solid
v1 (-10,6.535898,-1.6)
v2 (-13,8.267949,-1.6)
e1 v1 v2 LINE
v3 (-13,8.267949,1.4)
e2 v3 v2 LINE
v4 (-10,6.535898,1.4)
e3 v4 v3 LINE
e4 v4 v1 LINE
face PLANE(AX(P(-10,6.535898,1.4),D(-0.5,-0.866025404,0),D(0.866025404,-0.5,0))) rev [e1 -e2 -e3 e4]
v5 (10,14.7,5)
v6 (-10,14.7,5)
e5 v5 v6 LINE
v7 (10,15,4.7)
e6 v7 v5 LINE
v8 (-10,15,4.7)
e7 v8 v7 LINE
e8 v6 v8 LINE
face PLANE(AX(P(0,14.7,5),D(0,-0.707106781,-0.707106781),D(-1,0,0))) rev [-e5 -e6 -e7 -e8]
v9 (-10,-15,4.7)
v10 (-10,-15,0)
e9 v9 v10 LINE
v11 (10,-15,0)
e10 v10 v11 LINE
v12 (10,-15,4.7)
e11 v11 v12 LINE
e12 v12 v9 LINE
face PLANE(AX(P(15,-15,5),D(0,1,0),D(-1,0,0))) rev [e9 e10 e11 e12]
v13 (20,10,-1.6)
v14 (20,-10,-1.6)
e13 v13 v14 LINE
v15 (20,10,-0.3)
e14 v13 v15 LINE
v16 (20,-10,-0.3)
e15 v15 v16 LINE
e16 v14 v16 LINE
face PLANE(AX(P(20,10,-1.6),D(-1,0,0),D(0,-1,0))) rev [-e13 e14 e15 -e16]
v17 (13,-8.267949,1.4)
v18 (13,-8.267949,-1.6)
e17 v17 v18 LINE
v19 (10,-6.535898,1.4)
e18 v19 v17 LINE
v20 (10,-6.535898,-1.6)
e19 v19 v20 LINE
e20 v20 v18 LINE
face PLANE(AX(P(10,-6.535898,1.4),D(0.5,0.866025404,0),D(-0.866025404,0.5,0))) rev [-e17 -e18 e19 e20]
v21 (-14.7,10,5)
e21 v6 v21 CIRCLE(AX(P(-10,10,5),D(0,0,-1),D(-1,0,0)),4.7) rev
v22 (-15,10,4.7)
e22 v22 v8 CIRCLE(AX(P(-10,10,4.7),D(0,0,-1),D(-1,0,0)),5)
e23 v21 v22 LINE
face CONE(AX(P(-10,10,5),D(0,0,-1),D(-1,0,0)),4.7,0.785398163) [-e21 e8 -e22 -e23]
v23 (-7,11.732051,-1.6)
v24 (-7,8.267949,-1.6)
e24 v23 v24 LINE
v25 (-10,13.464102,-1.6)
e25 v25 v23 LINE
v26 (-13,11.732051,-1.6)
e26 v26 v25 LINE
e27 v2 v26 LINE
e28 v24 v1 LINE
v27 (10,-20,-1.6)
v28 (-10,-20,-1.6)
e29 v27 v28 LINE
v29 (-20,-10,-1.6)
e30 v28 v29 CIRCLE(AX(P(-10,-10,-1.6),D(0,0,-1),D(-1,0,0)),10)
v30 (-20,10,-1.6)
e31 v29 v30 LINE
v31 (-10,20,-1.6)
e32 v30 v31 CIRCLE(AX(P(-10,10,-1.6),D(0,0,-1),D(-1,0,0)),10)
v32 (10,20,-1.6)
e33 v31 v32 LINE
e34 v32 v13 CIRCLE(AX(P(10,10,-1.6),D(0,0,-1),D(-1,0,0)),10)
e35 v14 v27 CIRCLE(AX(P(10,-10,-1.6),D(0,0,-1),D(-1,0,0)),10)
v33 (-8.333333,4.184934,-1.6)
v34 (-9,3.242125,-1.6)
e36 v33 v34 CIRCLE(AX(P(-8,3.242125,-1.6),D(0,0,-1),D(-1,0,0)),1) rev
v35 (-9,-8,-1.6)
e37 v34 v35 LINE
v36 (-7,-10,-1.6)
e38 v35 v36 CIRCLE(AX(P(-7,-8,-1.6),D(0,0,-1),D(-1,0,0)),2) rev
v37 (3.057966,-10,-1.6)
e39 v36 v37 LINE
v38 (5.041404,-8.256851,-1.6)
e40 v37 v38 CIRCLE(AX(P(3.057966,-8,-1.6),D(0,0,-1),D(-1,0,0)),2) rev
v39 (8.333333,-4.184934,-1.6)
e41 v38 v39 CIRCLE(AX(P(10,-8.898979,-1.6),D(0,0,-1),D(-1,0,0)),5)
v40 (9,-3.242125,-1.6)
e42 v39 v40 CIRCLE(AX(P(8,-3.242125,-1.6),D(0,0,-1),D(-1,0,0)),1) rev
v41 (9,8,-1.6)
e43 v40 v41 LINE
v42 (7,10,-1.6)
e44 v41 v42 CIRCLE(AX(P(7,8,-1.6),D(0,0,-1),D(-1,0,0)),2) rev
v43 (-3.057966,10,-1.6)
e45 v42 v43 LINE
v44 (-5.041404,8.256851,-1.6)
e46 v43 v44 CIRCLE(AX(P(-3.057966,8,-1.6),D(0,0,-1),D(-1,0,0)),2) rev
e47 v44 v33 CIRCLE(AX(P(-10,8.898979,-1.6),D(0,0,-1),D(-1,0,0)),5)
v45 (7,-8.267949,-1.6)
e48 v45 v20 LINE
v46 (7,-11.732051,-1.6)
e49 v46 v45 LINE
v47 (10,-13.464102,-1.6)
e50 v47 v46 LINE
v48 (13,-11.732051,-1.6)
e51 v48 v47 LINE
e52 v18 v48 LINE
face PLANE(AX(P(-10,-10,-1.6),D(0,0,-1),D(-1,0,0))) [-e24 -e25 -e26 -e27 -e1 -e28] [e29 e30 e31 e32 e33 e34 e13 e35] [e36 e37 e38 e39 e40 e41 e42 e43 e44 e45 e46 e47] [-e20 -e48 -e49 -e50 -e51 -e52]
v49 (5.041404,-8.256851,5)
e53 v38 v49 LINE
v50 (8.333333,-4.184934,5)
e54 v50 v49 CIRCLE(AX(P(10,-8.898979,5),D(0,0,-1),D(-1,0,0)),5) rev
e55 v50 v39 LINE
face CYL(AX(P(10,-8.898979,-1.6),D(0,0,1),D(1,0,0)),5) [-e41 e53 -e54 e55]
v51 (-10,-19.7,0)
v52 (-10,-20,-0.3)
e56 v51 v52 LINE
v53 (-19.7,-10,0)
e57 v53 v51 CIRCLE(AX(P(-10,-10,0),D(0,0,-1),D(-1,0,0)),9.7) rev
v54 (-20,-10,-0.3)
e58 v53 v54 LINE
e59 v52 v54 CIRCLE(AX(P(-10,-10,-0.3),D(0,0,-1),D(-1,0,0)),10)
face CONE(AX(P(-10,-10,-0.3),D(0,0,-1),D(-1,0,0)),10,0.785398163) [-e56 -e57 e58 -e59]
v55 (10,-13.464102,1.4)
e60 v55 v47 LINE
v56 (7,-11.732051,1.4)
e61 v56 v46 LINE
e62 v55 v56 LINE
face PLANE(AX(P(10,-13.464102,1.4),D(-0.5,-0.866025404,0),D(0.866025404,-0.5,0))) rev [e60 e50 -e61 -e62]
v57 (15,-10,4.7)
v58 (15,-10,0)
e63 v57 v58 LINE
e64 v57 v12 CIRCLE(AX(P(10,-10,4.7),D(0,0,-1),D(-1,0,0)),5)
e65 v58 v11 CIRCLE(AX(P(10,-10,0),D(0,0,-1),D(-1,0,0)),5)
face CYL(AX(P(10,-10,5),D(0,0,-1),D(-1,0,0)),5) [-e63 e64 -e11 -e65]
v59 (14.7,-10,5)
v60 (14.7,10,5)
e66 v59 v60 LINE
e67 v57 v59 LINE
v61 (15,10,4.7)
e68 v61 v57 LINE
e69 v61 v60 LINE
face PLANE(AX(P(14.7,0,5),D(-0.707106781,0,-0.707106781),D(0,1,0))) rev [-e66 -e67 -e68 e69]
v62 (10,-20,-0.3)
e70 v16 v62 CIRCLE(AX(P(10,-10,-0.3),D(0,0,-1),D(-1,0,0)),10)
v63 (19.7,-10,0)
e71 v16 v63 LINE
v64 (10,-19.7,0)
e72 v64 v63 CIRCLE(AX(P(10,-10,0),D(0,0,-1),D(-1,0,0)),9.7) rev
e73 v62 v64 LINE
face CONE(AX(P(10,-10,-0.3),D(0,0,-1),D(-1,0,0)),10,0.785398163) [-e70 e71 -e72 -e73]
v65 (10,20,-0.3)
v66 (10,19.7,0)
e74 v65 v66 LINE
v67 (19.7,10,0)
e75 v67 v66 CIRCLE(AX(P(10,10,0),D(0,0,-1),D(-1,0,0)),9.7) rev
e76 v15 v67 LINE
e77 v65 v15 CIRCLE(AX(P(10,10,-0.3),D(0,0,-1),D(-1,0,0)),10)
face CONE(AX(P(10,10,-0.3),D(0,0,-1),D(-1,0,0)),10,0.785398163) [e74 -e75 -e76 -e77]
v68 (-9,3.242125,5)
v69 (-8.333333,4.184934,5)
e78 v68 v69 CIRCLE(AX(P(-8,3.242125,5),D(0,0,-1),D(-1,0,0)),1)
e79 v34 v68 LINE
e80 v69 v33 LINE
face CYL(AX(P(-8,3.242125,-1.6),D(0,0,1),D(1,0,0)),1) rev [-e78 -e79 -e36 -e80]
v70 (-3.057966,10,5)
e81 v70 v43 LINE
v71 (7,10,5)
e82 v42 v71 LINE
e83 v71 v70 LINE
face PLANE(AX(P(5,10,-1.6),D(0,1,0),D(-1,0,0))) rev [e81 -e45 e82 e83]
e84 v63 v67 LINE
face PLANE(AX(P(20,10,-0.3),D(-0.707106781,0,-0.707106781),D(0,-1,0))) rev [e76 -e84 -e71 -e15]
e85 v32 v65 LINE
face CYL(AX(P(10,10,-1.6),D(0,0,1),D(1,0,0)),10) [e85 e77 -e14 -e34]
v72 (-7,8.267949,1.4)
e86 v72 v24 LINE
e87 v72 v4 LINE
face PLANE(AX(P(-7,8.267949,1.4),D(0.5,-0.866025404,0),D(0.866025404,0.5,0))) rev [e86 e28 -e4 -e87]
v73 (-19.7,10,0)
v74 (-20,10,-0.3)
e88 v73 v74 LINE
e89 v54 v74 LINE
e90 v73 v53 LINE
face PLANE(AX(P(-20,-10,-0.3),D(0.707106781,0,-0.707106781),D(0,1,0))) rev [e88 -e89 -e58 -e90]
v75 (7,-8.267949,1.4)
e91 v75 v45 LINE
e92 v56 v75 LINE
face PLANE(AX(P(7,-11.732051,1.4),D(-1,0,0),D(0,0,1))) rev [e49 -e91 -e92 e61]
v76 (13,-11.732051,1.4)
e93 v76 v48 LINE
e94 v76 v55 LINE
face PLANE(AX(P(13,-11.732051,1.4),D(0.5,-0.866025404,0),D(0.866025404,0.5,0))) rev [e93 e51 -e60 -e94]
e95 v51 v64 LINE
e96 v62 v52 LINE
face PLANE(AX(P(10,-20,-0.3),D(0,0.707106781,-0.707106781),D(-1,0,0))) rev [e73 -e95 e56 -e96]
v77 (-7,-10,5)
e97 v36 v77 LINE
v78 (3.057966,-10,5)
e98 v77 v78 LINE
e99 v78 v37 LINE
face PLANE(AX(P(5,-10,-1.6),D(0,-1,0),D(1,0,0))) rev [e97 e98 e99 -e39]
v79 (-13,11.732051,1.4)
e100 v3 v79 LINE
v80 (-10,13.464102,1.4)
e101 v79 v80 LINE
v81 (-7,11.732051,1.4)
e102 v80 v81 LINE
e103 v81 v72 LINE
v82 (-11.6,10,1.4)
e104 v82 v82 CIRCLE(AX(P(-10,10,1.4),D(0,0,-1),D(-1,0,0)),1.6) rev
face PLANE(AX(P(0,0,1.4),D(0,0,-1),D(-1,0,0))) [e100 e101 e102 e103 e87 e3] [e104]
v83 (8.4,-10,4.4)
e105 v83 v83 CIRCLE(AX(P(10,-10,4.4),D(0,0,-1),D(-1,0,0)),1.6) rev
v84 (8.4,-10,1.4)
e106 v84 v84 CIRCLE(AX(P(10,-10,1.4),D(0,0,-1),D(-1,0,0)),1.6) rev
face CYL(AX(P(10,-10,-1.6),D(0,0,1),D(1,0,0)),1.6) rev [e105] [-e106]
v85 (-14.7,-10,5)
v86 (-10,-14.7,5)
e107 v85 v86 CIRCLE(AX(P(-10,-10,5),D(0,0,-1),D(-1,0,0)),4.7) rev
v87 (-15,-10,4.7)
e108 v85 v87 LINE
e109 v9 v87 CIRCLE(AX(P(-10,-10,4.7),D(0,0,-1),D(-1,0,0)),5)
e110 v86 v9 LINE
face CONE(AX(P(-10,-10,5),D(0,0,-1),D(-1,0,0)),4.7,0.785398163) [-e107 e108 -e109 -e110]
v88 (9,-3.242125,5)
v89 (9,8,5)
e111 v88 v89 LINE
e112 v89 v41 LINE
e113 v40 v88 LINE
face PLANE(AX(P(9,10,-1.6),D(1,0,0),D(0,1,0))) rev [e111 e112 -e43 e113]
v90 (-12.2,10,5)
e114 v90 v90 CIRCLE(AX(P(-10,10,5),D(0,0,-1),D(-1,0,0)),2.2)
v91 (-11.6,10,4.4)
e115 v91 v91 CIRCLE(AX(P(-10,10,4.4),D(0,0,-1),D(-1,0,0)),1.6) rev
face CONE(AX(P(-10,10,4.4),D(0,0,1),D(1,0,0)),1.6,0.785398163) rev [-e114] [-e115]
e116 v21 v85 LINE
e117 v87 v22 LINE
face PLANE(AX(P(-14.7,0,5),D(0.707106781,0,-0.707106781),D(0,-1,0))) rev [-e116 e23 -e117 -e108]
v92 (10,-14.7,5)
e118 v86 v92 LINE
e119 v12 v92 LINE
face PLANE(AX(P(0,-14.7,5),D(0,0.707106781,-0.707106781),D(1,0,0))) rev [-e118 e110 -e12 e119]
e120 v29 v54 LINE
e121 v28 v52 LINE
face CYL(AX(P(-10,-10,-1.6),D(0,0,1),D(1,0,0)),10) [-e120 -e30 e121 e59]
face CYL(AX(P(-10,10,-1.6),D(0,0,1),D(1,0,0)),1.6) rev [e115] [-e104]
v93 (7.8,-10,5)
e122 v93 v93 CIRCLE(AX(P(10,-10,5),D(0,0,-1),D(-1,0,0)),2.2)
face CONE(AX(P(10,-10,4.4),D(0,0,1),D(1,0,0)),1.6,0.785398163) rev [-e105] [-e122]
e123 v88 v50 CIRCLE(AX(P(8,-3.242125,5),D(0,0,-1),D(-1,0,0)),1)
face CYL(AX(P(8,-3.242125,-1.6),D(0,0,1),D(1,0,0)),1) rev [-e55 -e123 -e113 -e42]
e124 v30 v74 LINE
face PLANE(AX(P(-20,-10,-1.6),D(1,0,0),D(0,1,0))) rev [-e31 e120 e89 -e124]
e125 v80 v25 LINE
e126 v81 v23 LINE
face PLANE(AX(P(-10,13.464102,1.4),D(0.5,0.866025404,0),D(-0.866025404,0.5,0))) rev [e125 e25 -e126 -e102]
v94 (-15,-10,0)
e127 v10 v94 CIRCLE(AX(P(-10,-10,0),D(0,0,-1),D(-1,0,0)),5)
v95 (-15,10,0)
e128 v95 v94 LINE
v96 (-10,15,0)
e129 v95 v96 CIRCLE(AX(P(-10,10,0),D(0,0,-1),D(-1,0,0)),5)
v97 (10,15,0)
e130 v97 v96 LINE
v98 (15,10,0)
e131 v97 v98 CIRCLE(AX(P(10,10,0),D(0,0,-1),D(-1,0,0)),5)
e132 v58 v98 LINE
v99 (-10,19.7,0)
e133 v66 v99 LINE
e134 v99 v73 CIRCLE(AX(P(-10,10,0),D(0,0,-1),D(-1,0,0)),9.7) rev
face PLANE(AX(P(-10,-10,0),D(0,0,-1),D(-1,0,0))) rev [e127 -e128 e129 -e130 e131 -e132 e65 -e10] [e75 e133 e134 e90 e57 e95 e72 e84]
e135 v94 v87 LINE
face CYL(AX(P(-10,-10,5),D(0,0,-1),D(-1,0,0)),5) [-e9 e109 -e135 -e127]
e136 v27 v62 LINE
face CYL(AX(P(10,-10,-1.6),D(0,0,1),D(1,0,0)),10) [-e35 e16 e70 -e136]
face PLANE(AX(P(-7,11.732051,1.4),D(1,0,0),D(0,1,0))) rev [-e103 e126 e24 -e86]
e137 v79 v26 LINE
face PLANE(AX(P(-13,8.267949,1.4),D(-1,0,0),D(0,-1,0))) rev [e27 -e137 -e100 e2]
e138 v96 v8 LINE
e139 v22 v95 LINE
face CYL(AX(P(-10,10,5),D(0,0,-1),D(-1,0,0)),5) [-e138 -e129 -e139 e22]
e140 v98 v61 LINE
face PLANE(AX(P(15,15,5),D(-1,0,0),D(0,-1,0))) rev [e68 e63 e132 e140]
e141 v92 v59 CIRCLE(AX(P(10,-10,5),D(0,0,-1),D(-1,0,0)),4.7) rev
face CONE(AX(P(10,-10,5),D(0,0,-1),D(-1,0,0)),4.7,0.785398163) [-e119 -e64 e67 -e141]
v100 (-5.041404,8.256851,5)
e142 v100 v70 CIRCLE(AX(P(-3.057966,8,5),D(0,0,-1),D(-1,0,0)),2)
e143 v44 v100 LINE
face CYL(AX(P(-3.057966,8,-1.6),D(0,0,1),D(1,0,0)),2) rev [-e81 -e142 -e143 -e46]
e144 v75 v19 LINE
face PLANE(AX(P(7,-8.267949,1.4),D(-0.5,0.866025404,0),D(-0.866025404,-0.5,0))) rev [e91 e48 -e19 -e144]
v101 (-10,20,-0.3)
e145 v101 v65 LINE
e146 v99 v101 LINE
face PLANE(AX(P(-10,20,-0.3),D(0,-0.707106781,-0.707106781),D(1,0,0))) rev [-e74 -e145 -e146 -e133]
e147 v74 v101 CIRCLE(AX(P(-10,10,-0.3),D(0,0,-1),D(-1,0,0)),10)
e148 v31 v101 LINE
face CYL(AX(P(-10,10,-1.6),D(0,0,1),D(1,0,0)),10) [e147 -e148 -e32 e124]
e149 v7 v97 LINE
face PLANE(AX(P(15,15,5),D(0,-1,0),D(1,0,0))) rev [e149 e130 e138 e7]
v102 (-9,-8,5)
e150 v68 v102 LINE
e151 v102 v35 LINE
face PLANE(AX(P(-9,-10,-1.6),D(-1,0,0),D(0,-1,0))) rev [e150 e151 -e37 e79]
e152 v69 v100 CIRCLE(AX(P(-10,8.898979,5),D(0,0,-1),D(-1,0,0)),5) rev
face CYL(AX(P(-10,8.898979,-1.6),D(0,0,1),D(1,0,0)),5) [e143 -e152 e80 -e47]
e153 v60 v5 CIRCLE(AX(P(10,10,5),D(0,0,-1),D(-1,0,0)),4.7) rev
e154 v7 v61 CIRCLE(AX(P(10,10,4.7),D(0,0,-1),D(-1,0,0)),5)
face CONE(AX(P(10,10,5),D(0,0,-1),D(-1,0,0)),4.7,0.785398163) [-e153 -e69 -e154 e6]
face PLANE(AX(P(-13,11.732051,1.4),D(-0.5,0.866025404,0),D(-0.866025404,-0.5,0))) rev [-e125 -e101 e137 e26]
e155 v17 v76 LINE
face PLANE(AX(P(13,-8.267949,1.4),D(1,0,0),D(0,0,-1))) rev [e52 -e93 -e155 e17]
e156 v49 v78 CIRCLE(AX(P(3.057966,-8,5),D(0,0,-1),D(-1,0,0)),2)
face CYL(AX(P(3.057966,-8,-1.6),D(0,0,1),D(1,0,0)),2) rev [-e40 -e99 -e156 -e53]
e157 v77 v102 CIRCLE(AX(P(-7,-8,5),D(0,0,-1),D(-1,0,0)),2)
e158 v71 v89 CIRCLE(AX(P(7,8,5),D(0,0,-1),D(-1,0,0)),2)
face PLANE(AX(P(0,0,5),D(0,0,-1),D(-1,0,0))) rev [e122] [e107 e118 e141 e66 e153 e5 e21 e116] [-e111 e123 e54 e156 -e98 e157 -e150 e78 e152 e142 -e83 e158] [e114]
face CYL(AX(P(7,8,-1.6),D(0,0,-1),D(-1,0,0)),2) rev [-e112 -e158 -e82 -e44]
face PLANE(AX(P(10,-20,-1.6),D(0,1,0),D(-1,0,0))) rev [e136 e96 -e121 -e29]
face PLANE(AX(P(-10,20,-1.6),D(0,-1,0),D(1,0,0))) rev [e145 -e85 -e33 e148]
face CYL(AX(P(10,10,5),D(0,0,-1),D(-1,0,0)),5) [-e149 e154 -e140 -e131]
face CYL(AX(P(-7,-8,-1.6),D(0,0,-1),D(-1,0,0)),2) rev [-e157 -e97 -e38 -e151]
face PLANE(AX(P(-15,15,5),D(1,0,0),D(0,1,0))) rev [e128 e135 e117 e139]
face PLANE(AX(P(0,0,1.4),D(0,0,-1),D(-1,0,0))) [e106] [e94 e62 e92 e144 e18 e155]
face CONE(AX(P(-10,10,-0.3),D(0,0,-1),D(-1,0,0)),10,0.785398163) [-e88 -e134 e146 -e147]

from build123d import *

# Parameters (mm, degrees)
SKIZZE1_W          = 30
SKIZZE1_H          = 30
GRUNDK_RPER_DEPTH  = 5
VERRUNDUNG1_R      = 5
ABSATZ_DEPTH       = 1.6
SKIZZE3_R          = 1.6
M3_BOHRUNGEN_DEPTH = 30.044104393
M3_SCHSKANT_DEPTH  = 3
DURCHBRUCH_DEPTH   = 30.044104393
VERRUNDUNG2_R      = 5
VERRUNDUNG3_R      = 2
VERRUNDUNG4_R      = 1
FASE1_SIZE         = 0.3
FASE2_SIZE         = 0.6


with BuildPart() as part:
    # Skizze1 → Grundkörper (new body)
    with BuildSketch(Plane.XY):
        Rectangle(SKIZZE1_W, SKIZZE1_H)
    extrude(amount=GRUNDK_RPER_DEPTH)

    # Verrundung1
    verrundung1_edges = [part.edges().sort_by_distance(p)[0] for p in [
        (-15, 15, 2.5),
        (15, 15, 2.5),
        (15, -15, 2.5),
        (-15, -15, 2.5),
    ]]
    fillet(verrundung1_edges, radius=VERRUNDUNG1_R)

    # Skizze2 → Absatz (add)
    with BuildSketch(Plane(origin=(0, 0, 0), x_dir=(-1, 0, 0), z_dir=(0, 0, -1))):
        with BuildLine():
            Line((20, -10), (20, 10))
            ThreePointArc((20, 10), (17.071067812, 17.071067812), (10, 20))
            Line((10, 20), (-10, 20))
            ThreePointArc((-10, 20), (-17.071067812, 17.071067812), (-20, 10))
            Line((-20, 10), (-20, -10))
            ThreePointArc((-20, -10), (-17.071067812, -17.071067812), (-10, -20))
            Line((-10, -20), (10, -20))
            ThreePointArc((10, -20), (17.071067812, -17.071067812), (20, -10))
        make_face()
    extrude(amount=ABSATZ_DEPTH)

    # Skizze3 → M3 Bohrungen (cut, through all)
    with BuildSketch(Plane.XY.offset(5)):
        with Locations((-10, 10)):
            Circle(SKIZZE3_R)
        with Locations((10, -10)):
            Circle(SKIZZE3_R)
    extrude(amount=-M3_BOHRUNGEN_DEPTH, mode=Mode.SUBTRACT)

    # Skizze4 → M3 Schskant (cut)
    with BuildSketch(Plane(origin=(0, 0, -1.6), x_dir=(-1, 0, 0), z_dir=(0, 0, -1))):
        Polygon((10, 6.535898385), (13, 8.267949192), (13, 11.732050808), (10, 13.464101615), (7, 11.732050808), (7, 8.267949192), align=None)
        Polygon((-10, -6.535898385), (-13, -8.267949192), (-13, -11.732050808), (-10, -13.464101615), (-7, -11.732050808), (-7, -8.267949192), align=None)
    extrude(amount=-M3_SCHSKANT_DEPTH, mode=Mode.SUBTRACT)

    # Skizze5 → Durchbruch (cut, through all)
    with BuildSketch(Plane.XY.offset(5)):
        Polygon((5, 10), (-5, 10), (-5, 4), (-9, 4), (-9, -10), (-5, -10), (5, -10), (5, -4), (9, -4), (9, 10), align=None)
    extrude(amount=-DURCHBRUCH_DEPTH, mode=Mode.SUBTRACT)

    # Verrundung2
    # the kernel refuses this fillet: 5 mm, written as the material it takes off along each edge
    with BuildSketch(Plane(origin=(5, -4, 17.247448714), x_dir=(1.0, -1.5394352459447556e-12, 0), z_dir=(0, 0, -1)), Plane(origin=(-5, 4, 17.247448714), x_dir=(-1.0, 1.5605294834126232e-12, 0), z_dir=(0, 0, -1))) as verrundung2_piece_1:
        with BuildLine():
            CenterArc((5, 4.898979486), VERRUNDUNG2_R, 180, 78.463040967)
            Line((0, 4.898979486), (-0.1, 4.898979486))
            Line((-0.1, 4.898979486), (-0.1, 0))
            Line((-0.1, 0), (0, -0.1))
            ThreePointArc((0, -0.1), (2, -0.1), (3.98, -0.09797959))
            Line((3.98, -0.09797959), (4, 0))
        make_face()
    extrude(amount=31.094897428, mode=Mode.SUBTRACT)

    # Verrundung3
    verrundung3_edges = [part.edges().sort_by_distance(p)[0] for p in [
        (5, -10, 1.7),
        (-9, -10, 1.7),
        (-5, 10, 1.7),
        (9, 10, 1.7),
    ]]
    fillet(verrundung3_edges, radius=VERRUNDUNG3_R)

    # Verrundung4
    verrundung4_edges = [part.edges().sort_by_distance(p)[0] for p in [
        (-9, 4, 1.7),
        (9, -4, 1.7),
    ]]
    fillet(verrundung4_edges, radius=VERRUNDUNG4_R)

    # Fase1
    fase1_edges = [part.edges().sort_by_distance(p)[0] for p in [
        (-15, 0, 5),
        (0, 15, 5),
        (0, -15, 5),
        (15, 0, 5),
        (13.535533906, 13.535533906, 5),
        (13.535533906, -13.535533906, 5),
        (-13.535533906, -13.535533906, 5),
        (-13.535533906, 13.535533906, 5),
        (-17.071067812, -17.071067812, 0),
        (-20, 0, 0),
        (-17.071067812, 17.071067812, 0),
        (0, 20, 0),
        (17.071067812, 17.071067812, 0),
        (20, 0, 0),
        (17.071067812, -17.071067812, 0),
        (0, -20, 0),
    ]]
    chamfer(fase1_edges, length=FASE1_SIZE)

    # Fase2
    fase2_edges = [part.edges().sort_by_distance(p)[0] for p in [
        (-11.6, 10, 5),
        (8.4, -10, 5),
    ]]
    chamfer(fase2_edges, length=FASE2_SIZE)


solid = part.part
